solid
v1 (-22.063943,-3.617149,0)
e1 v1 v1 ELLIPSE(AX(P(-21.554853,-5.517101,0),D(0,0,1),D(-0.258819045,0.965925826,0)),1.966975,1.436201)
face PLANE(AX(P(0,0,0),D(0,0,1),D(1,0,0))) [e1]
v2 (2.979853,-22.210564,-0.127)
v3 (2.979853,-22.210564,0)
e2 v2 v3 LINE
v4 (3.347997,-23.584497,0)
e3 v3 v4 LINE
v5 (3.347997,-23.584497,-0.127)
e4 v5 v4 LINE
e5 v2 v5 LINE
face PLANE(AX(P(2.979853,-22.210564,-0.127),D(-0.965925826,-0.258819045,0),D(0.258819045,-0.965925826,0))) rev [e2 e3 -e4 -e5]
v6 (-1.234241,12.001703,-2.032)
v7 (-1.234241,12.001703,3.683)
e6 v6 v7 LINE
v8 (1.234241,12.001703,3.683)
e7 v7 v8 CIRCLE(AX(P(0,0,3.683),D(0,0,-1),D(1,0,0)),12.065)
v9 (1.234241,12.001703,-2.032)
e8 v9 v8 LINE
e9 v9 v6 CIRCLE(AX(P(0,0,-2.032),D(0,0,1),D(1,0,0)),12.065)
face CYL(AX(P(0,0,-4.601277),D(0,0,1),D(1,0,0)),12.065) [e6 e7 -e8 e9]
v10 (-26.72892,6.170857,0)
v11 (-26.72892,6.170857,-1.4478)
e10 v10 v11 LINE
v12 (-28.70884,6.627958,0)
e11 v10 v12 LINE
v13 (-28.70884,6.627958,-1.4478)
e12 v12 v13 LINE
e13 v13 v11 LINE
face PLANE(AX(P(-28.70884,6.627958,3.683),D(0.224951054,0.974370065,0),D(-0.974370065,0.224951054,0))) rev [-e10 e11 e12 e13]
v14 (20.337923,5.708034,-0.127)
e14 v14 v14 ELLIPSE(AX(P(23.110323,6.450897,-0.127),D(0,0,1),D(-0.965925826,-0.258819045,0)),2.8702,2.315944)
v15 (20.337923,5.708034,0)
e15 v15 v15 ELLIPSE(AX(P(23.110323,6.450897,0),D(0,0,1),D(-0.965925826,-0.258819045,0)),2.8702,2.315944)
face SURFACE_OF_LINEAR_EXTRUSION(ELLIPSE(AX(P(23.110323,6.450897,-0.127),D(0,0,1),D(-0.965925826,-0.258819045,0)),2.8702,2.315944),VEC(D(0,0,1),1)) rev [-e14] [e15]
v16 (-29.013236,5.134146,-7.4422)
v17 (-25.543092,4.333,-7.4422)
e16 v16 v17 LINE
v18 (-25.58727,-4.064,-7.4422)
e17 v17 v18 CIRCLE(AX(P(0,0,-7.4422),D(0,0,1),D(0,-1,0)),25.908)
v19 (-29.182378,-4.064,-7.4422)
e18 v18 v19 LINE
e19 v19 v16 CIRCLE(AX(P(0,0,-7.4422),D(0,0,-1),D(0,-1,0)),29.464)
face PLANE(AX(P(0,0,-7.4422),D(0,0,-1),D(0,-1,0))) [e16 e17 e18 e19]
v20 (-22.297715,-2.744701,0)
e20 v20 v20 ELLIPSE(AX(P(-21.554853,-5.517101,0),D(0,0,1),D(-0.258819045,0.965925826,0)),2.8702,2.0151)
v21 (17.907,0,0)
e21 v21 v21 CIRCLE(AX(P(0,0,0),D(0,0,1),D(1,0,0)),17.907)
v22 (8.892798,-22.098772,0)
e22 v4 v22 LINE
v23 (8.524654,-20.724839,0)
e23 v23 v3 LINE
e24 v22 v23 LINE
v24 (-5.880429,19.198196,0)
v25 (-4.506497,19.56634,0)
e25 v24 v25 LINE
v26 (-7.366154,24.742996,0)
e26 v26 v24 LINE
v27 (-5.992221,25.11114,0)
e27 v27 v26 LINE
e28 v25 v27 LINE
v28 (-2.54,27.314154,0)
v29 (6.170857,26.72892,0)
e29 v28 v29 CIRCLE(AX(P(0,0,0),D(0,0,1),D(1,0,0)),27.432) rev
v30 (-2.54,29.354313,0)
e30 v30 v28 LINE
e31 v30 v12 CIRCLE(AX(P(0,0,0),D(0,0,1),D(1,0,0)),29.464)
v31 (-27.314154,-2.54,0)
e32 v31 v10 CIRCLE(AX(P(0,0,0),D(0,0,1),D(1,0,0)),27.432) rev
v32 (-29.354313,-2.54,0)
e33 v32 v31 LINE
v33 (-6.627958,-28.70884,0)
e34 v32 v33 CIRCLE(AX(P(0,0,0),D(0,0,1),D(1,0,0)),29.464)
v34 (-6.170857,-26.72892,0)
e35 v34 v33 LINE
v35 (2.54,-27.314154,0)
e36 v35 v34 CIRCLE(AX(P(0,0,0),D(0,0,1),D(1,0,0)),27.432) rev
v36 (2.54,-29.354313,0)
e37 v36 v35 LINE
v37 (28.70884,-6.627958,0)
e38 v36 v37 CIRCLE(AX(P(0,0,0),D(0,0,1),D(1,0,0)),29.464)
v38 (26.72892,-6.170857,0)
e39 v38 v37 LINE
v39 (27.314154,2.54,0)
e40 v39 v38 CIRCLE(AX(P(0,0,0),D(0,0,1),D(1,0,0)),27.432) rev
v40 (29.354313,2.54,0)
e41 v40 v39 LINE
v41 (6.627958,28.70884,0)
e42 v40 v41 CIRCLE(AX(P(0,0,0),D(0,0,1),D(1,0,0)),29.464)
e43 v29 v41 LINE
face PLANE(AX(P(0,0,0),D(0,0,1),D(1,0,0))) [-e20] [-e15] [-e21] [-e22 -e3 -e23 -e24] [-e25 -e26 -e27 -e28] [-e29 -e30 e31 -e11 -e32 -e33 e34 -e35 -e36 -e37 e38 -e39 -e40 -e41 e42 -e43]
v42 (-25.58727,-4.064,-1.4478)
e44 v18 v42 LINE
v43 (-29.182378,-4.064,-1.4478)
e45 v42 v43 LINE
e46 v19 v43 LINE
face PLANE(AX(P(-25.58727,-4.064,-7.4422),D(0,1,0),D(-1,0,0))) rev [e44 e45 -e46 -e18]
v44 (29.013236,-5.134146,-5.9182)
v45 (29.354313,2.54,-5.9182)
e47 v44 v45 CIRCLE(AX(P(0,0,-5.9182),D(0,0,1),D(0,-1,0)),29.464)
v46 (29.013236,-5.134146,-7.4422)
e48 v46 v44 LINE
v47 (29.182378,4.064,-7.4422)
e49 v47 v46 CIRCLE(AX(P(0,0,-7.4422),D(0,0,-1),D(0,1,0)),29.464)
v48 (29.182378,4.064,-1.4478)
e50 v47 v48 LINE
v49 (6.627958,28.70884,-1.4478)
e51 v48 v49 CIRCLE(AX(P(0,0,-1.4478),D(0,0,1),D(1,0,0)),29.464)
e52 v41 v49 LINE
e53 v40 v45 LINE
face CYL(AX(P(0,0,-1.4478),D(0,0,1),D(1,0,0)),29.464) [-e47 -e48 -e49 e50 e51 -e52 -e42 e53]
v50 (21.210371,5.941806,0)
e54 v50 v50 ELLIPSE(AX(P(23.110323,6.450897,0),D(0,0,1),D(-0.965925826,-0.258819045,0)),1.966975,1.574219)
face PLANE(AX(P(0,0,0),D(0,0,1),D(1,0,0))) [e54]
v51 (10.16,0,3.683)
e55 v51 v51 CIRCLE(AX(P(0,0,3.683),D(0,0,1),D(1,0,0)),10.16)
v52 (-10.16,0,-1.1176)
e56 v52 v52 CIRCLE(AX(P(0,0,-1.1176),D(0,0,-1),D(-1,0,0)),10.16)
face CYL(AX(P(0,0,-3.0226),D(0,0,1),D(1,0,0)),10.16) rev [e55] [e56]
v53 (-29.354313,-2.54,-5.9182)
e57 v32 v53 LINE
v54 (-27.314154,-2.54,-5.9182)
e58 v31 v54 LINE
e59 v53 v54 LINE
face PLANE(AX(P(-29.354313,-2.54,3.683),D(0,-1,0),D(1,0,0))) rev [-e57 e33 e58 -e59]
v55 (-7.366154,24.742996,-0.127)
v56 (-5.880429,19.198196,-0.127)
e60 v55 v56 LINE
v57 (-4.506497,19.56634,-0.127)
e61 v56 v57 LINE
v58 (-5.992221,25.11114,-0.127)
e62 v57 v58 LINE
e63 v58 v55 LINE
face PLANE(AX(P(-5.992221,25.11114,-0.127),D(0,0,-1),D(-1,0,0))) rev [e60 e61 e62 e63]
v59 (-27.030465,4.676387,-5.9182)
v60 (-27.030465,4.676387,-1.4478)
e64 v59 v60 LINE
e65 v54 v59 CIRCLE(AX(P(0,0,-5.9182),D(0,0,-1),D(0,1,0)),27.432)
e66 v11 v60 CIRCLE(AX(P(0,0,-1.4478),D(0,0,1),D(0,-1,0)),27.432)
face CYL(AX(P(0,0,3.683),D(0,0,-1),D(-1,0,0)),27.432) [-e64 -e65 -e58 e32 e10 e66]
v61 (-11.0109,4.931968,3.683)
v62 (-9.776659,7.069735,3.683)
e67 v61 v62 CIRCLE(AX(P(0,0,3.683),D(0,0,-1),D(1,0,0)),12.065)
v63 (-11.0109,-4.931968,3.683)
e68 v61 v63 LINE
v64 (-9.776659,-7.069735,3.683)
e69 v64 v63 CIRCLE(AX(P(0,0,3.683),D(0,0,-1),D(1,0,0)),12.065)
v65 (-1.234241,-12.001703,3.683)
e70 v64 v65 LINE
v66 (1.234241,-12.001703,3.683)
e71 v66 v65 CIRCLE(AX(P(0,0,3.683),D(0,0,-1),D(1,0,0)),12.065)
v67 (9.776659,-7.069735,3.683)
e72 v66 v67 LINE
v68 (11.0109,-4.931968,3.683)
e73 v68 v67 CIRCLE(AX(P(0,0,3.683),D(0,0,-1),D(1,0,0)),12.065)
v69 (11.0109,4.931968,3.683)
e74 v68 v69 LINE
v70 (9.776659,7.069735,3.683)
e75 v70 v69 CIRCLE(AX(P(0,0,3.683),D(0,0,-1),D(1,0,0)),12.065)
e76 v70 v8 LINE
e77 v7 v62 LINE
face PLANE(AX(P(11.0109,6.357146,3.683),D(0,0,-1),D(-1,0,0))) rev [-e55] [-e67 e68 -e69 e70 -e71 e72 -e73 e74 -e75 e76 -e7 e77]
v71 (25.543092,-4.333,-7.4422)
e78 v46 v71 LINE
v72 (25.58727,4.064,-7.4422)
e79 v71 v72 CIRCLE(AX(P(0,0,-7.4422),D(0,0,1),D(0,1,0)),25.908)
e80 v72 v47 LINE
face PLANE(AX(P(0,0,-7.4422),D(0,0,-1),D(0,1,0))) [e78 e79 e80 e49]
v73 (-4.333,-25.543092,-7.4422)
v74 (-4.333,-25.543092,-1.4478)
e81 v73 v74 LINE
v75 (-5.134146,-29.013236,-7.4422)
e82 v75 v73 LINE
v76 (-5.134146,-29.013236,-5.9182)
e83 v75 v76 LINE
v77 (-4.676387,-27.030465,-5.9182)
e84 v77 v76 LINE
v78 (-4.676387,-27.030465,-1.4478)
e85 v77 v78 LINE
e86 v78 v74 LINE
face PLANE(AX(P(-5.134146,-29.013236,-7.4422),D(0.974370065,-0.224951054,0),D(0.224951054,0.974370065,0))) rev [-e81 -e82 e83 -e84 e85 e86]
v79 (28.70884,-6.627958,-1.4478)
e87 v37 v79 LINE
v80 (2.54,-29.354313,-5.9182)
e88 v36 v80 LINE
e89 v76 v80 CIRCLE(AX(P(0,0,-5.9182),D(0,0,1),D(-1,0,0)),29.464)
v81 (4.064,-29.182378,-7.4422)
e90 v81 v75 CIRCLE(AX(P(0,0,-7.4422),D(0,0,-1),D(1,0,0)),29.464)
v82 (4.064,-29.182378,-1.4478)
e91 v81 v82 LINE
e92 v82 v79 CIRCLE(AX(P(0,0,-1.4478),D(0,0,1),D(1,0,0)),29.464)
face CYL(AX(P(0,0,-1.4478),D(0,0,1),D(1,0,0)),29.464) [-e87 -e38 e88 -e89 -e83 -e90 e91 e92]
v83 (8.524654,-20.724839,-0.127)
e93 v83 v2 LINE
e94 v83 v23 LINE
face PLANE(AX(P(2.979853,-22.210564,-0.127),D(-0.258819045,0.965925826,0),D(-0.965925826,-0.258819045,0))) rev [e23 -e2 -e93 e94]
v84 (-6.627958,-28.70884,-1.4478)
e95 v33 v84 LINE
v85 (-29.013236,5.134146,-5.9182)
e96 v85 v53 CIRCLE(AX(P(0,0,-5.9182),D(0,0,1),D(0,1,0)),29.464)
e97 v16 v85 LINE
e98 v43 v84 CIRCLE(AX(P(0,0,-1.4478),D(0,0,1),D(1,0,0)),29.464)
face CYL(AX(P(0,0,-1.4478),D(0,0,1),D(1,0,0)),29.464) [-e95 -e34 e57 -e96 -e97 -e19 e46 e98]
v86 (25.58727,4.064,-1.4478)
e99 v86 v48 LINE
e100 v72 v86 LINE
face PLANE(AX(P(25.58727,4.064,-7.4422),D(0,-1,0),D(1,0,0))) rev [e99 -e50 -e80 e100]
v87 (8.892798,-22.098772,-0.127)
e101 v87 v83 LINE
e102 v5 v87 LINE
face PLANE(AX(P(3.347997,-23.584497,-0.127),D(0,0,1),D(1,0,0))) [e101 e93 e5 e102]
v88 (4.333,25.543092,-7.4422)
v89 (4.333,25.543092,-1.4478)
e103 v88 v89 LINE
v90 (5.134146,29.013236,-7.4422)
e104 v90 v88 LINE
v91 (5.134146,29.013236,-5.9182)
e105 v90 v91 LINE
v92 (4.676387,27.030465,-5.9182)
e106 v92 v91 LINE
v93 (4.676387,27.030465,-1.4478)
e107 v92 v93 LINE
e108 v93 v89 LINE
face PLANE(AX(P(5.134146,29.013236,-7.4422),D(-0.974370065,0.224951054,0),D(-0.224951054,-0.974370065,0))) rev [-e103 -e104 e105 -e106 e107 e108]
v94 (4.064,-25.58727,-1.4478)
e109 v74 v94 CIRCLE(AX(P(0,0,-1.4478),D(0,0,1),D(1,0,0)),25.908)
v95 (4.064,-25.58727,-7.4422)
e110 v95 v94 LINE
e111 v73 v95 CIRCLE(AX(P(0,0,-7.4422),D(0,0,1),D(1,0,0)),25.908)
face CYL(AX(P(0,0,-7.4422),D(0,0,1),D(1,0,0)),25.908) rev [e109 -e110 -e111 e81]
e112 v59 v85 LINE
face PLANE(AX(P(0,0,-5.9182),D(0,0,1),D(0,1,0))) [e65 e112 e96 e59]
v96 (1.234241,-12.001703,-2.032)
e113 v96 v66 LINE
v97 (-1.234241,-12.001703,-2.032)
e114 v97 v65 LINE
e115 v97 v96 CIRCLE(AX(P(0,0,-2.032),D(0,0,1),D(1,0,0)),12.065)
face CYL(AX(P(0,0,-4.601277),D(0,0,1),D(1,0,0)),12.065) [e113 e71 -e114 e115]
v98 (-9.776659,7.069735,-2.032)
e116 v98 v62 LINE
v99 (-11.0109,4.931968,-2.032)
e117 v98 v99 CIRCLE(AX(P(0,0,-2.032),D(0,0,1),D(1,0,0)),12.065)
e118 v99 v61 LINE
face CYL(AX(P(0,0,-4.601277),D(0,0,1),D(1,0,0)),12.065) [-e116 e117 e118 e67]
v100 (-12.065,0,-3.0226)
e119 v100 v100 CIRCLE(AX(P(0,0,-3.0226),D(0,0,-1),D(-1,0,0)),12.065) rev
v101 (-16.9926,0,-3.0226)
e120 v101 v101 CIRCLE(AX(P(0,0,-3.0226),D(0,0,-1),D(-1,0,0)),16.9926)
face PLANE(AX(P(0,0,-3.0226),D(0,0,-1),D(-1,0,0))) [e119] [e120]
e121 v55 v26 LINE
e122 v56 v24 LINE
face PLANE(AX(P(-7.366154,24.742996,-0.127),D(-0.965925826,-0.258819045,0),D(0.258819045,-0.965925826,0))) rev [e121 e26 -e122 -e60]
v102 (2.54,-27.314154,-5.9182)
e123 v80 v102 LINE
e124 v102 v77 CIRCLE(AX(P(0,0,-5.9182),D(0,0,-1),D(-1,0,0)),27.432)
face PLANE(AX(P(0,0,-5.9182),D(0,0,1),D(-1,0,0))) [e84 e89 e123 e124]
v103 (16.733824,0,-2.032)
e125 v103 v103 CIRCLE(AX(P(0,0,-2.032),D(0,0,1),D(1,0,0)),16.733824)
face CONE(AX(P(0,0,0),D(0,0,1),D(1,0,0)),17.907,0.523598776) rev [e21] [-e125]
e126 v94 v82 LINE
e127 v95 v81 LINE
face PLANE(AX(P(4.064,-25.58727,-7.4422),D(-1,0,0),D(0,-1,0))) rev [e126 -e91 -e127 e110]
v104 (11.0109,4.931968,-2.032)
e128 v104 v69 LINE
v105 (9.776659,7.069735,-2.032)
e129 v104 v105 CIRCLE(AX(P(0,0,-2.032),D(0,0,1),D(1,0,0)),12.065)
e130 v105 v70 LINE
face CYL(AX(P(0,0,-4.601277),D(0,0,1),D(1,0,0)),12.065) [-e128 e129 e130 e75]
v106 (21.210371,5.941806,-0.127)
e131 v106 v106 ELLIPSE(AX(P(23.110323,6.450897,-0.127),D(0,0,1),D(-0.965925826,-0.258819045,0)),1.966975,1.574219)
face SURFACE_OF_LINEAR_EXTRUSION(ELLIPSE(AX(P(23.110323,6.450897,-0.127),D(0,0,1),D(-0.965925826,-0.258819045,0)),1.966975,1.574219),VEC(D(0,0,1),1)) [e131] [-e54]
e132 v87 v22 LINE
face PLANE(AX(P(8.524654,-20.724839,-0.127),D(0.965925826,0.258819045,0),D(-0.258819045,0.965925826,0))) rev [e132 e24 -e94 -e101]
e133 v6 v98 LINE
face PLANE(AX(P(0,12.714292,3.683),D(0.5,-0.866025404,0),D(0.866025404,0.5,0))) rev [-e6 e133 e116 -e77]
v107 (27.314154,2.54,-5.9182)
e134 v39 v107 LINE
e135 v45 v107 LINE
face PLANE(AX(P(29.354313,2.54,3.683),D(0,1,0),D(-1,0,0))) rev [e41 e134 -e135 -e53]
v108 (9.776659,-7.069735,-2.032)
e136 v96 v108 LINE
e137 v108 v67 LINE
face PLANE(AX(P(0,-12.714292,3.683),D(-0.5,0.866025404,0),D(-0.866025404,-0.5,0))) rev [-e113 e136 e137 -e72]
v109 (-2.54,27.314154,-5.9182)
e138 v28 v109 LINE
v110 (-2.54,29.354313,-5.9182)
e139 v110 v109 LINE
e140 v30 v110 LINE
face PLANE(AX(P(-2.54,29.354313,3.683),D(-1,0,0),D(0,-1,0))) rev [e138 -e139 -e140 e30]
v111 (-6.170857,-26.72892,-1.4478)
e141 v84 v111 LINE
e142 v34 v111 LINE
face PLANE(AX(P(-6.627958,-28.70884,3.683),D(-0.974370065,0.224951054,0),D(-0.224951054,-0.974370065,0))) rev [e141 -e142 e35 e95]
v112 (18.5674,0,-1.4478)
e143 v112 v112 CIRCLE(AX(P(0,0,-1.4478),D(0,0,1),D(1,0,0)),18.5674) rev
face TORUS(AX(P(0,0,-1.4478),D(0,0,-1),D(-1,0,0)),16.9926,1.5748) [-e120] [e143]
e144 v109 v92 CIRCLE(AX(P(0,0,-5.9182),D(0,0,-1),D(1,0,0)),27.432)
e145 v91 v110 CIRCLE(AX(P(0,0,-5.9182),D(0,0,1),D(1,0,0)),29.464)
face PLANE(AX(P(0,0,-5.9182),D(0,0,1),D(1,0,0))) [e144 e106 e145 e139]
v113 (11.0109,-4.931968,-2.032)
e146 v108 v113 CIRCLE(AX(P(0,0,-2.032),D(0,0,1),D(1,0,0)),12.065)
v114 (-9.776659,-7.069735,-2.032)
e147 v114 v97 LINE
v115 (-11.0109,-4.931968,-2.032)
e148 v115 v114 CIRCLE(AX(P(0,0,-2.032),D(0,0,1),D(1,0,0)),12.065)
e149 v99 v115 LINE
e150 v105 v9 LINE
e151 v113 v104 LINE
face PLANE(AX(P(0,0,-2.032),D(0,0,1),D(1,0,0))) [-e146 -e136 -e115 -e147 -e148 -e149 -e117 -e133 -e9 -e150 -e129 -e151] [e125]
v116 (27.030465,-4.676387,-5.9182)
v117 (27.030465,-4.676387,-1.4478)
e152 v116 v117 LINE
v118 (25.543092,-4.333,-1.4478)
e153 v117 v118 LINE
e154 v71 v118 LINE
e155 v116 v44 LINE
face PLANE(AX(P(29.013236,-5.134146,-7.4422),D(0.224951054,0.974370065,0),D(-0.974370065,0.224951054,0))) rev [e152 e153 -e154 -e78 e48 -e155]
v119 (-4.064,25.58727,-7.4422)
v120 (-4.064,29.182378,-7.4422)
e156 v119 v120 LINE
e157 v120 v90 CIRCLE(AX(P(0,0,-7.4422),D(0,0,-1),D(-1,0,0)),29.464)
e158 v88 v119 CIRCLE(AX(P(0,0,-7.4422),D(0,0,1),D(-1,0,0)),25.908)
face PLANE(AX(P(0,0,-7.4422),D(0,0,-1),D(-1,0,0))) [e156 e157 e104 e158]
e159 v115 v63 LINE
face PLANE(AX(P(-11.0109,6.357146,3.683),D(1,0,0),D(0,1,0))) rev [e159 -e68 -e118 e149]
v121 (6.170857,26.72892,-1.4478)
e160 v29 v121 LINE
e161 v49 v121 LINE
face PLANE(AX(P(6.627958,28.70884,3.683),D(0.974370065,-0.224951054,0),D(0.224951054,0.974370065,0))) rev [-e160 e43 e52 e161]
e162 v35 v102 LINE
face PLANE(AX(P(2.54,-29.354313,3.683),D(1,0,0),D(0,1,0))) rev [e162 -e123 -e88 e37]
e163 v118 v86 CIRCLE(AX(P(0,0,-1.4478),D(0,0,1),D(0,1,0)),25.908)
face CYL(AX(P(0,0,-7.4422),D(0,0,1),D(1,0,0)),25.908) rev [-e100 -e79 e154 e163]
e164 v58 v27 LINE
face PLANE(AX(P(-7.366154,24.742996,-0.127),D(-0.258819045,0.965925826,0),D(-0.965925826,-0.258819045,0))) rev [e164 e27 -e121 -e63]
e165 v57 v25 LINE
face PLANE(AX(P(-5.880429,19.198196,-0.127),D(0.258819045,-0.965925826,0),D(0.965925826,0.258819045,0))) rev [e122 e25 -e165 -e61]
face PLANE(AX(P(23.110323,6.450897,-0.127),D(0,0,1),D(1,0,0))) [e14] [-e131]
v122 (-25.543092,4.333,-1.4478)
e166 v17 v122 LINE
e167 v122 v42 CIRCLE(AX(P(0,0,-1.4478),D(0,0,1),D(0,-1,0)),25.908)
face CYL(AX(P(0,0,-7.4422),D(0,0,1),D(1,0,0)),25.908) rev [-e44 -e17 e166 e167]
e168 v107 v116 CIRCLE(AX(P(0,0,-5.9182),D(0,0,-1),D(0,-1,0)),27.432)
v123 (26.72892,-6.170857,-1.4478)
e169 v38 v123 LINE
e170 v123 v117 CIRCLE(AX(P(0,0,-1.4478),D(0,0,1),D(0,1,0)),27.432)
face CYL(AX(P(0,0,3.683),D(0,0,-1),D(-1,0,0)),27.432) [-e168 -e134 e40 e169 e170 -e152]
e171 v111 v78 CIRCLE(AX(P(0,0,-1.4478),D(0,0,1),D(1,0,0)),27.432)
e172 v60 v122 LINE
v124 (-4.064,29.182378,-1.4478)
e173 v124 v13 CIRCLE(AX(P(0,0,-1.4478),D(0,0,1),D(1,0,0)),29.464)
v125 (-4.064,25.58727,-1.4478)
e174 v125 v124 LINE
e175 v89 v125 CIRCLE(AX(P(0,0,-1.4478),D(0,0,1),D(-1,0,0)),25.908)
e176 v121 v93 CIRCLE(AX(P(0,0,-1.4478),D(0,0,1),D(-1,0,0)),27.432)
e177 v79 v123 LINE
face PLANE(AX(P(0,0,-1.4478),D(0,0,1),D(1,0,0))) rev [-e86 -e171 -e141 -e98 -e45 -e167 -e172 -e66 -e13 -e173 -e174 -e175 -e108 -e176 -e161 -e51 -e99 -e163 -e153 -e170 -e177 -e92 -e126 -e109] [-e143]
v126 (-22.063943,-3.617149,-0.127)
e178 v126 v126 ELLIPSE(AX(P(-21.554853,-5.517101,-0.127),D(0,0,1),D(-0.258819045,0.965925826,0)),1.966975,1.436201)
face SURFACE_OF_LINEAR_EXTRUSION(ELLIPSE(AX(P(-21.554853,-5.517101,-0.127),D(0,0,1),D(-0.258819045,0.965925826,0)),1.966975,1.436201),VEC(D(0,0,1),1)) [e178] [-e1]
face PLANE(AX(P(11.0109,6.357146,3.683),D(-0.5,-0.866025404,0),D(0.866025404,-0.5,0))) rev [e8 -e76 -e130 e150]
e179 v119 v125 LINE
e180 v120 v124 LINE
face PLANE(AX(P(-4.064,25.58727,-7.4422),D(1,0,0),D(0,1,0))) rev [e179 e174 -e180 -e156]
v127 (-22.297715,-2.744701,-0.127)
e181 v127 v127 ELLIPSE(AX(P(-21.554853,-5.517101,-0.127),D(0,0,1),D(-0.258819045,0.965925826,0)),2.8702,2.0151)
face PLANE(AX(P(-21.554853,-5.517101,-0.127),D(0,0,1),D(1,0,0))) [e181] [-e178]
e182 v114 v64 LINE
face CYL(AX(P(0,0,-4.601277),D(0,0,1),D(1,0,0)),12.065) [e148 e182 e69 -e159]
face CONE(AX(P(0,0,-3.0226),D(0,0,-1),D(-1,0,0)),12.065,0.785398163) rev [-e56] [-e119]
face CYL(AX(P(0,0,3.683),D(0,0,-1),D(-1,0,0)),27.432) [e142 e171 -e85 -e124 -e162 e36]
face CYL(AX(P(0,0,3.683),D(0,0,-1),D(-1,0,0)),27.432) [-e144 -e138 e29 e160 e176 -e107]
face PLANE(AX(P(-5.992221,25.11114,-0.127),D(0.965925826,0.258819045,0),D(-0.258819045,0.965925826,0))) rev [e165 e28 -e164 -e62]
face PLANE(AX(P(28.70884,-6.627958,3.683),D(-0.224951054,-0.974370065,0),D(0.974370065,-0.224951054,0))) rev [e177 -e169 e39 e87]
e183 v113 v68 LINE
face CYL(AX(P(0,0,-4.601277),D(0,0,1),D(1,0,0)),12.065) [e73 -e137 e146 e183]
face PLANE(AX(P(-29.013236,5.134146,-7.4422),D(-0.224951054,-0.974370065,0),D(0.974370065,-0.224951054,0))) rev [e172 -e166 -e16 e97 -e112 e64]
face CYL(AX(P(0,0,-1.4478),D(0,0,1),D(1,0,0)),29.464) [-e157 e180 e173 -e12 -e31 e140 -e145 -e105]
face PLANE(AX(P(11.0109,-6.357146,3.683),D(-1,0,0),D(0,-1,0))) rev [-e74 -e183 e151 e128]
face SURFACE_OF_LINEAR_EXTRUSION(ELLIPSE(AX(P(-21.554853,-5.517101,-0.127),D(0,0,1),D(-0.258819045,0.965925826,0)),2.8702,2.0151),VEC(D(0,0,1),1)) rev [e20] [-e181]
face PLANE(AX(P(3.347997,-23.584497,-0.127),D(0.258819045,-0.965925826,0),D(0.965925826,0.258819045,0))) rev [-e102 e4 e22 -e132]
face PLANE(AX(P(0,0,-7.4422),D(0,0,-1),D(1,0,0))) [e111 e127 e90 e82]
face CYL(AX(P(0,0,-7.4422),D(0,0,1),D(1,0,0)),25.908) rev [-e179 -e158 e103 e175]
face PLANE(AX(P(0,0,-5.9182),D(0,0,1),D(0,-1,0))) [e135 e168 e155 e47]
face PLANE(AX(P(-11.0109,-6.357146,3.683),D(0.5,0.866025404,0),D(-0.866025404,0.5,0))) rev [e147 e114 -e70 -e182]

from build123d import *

# Parameters (mm, degrees)
SKETCH1_R           = 29.464
BASE_EXTRUDE_DEPTH  = 1.4478
SKETCH2_R           = 18.5674
BOSS_EXTRUDE1_DEPTH = 1.5748
FILLET1_R           = 1.5748
SKETCH3_R           = 17.907
CUT_EXTRUDE1_DEPTH  = 2.032
CUT_EXTRUDE1_DRAFT  = -30
BOSS_EXTRUDE2_DEPTH = 5.715
CUT_EXTRUDE2_START  = -5.715
CUT_EXTRUDE2_DEPTH  = 5.715
SKETCH6_R           = 10.16
CUT_EXTRUDE3_DEPTH  = 43.204498141
CUT_EXTRUDE4_DEPTH  = 42.983088269
CIRPATTERN1_COUNT   = 4
BOSS_EXTRUDE3_DEPTH = 5.9944
CUT_EXTRUDE5_DEPTH  = 4.4704
CIRPATTERN2_COUNT   = 4
CUT_EXTRUDE6_DEPTH  = 0.127
CUT_EXTRUDE7_DEPTH  = 0.127
SKETCH13_RX         = 2.8702
SKETCH13_RY         = 2.315943611
SKETCH13_RX_2       = 1.966975065
SKETCH13_RY_2       = 1.574218937
SKETCH13_RY_3       = 2.01509994
SKETCH13_RX_3       = 1.966974984
SKETCH13_RY_4       = 1.436201162
CUT_EXTRUDE8_DEPTH  = 0.127
CHAMFER1_SIZE       = 1.905


# Read off the part's stored shape, not the designer's step: Cut-Extrude2
with BuildPart() as part:
    # Sketch1 → Base-Extrude (new body)
    with BuildSketch(Plane.XY):
        Circle(SKETCH1_R)
    extrude(amount=-BASE_EXTRUDE_DEPTH)

    # Sketch2 → Boss-Extrude1 (add)
    with BuildSketch(Plane(origin=(0, 0, -1.4478), x_dir=(-1, 0, 0), z_dir=(0, 0, -1))):
        with Locations(Location((0, 0, 0), (0, 0, 180))):
            Circle(SKETCH2_R)
    extrude(amount=BOSS_EXTRUDE1_DEPTH)

    # Fillet1
    fillet1_edges = [part.edges().sort_by_distance(p)[0] for p in [
        (-18.5674, 0, -3.0226),
    ]]
    fillet(fillet1_edges, radius=FILLET1_R - 0.0001)  # a hair under: the kernel refuses the full size


with BuildPart() as cut_extrude1_tool:
    # Sketch3 → Cut-Extrude1 (with draft: the straight prism first)
    with BuildSketch(Plane.XY):
        Circle(SKETCH3_R)
    extrude(amount=-CUT_EXTRUDE1_DEPTH)
    # Cut-Extrude1: the draft: its side faces are tilted about the plane it starts from
    cut_extrude1_sides = [cut_extrude1_tool.faces().sort_by_distance(p)[0] for p in [
        (-17.907, 0, -1.016),
    ]]
    draft(cut_extrude1_sides, Plane.XY, CUT_EXTRUDE1_DRAFT)


with BuildPart() as part_1:
    add(part.part)

    # Cut-Extrude1: cut by cut_extrude1_tool
    add(cut_extrude1_tool.part, mode=Mode.SUBTRACT)

    # Sketch4 → Boss-Extrude2 (add)
    with BuildSketch(Plane.XY.offset(-2.032)):
        Polygon((0, 12.714292158), (-11.0109, 6.357146079), (-11.0109, -6.357146079), (0, -12.714292158), (11.0109, -6.357146079), (11.0109, 6.357146079), align=None)
    extrude(amount=BOSS_EXTRUDE2_DEPTH)

    # Cut-Extrude2 outline → Cut-Extrude2 (cut)
    with BuildSketch(Plane.XY.offset(3.683).offset(CUT_EXTRUDE2_START)):
        with BuildLine():
            ThreePointArc((-11.0109, 4.931967781), (-10.448596497, 6.0325), (-9.776659389, 7.069735228))
            Line((-9.776659389, 7.069735228), (-11.0109, 6.357146079))
            Line((-11.0109, 6.357146079), (-11.0109, 4.931967781))
        make_face()
        with BuildLine():
            Line((0, 12.714292158), (-1.234240611, 12.001703009))
            ThreePointArc((-1.234240611, 12.001703009), (0, 12.065), (1.234240611, 12.001703009))
            Line((1.234240611, 12.001703009), (0, 12.714292158))
        make_face()
        with BuildLine():
            ThreePointArc((-9.776659389, -7.069735228), (-10.448596497, -6.0325), (-11.0109, -4.931967781))
            Line((-11.0109, -4.931967781), (-11.0109, -6.357146079))
            Line((-11.0109, -6.357146079), (-9.776659389, -7.069735228))
        make_face()
        with BuildLine():
            Line((11.0109, 6.357146079), (9.776659389, 7.069735228))
            ThreePointArc((9.776659389, 7.069735228), (10.448596497, 6.0325), (11.0109, 4.931967781))
            Line((11.0109, 4.931967781), (11.0109, 6.357146079))
        make_face()
        with BuildLine():
            ThreePointArc((1.234240611, -12.001703009), (0, -12.065), (-1.234240611, -12.001703009))
            Line((-1.234240611, -12.001703009), (0, -12.714292158))
            Line((0, -12.714292158), (1.234240611, -12.001703009))
        make_face()
        with BuildLine():
            Line((11.0109, -6.357146079), (11.0109, -4.931967781))
            ThreePointArc((11.0109, -4.931967781), (10.448596497, -6.0325), (9.776659389, -7.069735228))
            Line((9.776659389, -7.069735228), (11.0109, -6.357146079))
        make_face()
    extrude(amount=CUT_EXTRUDE2_DEPTH, mode=Mode.SUBTRACT)

    # Sketch6 → Cut-Extrude3 (cut, through all)
    with BuildSketch(Plane.XY.offset(3.683)):
        Circle(SKETCH6_R)
    extrude(amount=-CUT_EXTRUDE3_DEPTH, mode=Mode.SUBTRACT)

    # Sketch8 → Cut-Extrude4 (cut, through all)
    with BuildSketch(Plane(origin=(0, 0, -1.4478), x_dir=(-1, 0, 0), z_dir=(0, 0, -1))):
        with BuildLine():
            Line((2.54, 29.354313073), (2.54, 27.314154279))
            ThreePointArc((2.54, 27.314154279), (-1.838860007, 27.370298096), (-6.170857323, 26.728919617))
            Line((-6.170857323, 26.728919617), (-6.627957865, 28.708839589))
            ThreePointArc((-6.627957865, 28.708839589), (-2.069301544, 29.391245076), (2.54, 29.354313073))
        make_face()
    cut_extrude4 = extrude(amount=-CUT_EXTRUDE4_DEPTH, mode=Mode.SUBTRACT)

    # CirPattern1: Cut-Extrude4 ×4 about axis
    cirpattern1_axis = Axis((0, 0, 0), (0, 0, 1))
    for i in range(1, CIRPATTERN1_COUNT):
        add(cut_extrude4.rotate(cirpattern1_axis, i * 360 / CIRPATTERN1_COUNT), mode=Mode.SUBTRACT)

    # Sketch9 → Boss-Extrude3 (add)
    with BuildSketch(Plane(origin=(0, 0, -1.4478), x_dir=(-1, 0, 0), z_dir=(0, 0, -1))):
        with BuildLine():
            Line((4.064, 25.587269647), (4.064, 29.182378244))
            ThreePointArc((4.064, 29.182378244), (-0.541715145, 29.459019683), (-5.134145774, 29.013235655))
            Line((-5.134145774, 29.013235655), (-4.333000099, 25.543092494))
            ThreePointArc((-4.333000099, 25.543092494), (-0.136301756, 25.907641456), (4.064, 25.587269647))
        make_face()
    boss_extrude3 = extrude(amount=BOSS_EXTRUDE3_DEPTH)

    # Sketch10 → Cut-Extrude5 (cut)
    with BuildSketch(Plane.XY.offset(-1.4478)):
        with BuildLine():
            Line((5.134145774, 29.013235655), (4.676387057, 27.030464815))
            ThreePointArc((4.676387057, 27.030464815), (1.07757011, 27.410827544), (-2.54, 27.314154279))
            Line((-2.54, 27.314154279), (-2.54, 29.354313073))
            ThreePointArc((-2.54, 29.354313073), (1.308236036, 29.434942067), (5.134145774, 29.013235655))
        make_face()
    cut_extrude5 = extrude(amount=-CUT_EXTRUDE5_DEPTH, mode=Mode.SUBTRACT)

    # CirPattern2: Boss-Extrude3, Cut-Extrude5 ×4 about axis
    cirpattern2_axis = Axis((0, 0, 0), (0, 0, 1))
    add([boss_extrude3.rotate(cirpattern2_axis, i * 360 / CIRPATTERN2_COUNT) for i in range(1, CIRPATTERN2_COUNT)])
    add([cut_extrude5.rotate(cirpattern2_axis, i * 360 / CIRPATTERN2_COUNT) for i in range(1, CIRPATTERN2_COUNT)], mode=Mode.SUBTRACT)

    # Sketch11 → Cut-Extrude6 (cut)
    with BuildSketch(Plane.XY):
        Polygon((-7.366154253, 24.742996139), (-5.880429407, 19.198195525), (-4.506496511, 19.566339735), (-5.992221358, 25.111140348), align=None)
    extrude(amount=-CUT_EXTRUDE6_DEPTH, mode=Mode.SUBTRACT)

    # Sketch12 → Cut-Extrude7 (cut)
    with BuildSketch(Plane.XY):
        Polygon((2.979852971, -22.210563913), (8.524653584, -20.724839066), (8.892797794, -22.098771961), (3.347997181, -23.584496808), align=None)
    extrude(amount=-CUT_EXTRUDE7_DEPTH, mode=Mode.SUBTRACT)

    # Sketch13 → Cut-Extrude8 (cut)
    # profile 1 of 2: a face of its own
    with BuildSketch(Plane.XY):
        with Locations(Location((23.11032284, 6.450896771), (0, 0, -165))):
            Ellipse(SKETCH13_RX, SKETCH13_RY)
        with Locations(Location((23.11032284, 6.450896771), (0, 0, -165))):
            Ellipse(SKETCH13_RX_2, SKETCH13_RY_2, mode=Mode.SUBTRACT)
    # profile 2 of 2: a face of its own
    with BuildSketch(Plane.XY):
        with Locations(Location((-21.554852577, -5.517100911), (0, 0, -75))):
            Ellipse(SKETCH13_RX, SKETCH13_RY_3)
        with Locations(Location((-21.554852577, -5.517100911), (0, 0, -75))):
            Ellipse(SKETCH13_RX_3, SKETCH13_RY_4, mode=Mode.SUBTRACT)
    extrude(amount=-CUT_EXTRUDE8_DEPTH, mode=Mode.SUBTRACT)

    # Chamfer1
    chamfer1_edges = [part_1.edges().sort_by_distance(p)[0] for p in [
        (-10.16, 0, -3.0226),
    ]]
    chamfer(chamfer1_edges, length=CHAMFER1_SIZE)


solid = part_1.part
